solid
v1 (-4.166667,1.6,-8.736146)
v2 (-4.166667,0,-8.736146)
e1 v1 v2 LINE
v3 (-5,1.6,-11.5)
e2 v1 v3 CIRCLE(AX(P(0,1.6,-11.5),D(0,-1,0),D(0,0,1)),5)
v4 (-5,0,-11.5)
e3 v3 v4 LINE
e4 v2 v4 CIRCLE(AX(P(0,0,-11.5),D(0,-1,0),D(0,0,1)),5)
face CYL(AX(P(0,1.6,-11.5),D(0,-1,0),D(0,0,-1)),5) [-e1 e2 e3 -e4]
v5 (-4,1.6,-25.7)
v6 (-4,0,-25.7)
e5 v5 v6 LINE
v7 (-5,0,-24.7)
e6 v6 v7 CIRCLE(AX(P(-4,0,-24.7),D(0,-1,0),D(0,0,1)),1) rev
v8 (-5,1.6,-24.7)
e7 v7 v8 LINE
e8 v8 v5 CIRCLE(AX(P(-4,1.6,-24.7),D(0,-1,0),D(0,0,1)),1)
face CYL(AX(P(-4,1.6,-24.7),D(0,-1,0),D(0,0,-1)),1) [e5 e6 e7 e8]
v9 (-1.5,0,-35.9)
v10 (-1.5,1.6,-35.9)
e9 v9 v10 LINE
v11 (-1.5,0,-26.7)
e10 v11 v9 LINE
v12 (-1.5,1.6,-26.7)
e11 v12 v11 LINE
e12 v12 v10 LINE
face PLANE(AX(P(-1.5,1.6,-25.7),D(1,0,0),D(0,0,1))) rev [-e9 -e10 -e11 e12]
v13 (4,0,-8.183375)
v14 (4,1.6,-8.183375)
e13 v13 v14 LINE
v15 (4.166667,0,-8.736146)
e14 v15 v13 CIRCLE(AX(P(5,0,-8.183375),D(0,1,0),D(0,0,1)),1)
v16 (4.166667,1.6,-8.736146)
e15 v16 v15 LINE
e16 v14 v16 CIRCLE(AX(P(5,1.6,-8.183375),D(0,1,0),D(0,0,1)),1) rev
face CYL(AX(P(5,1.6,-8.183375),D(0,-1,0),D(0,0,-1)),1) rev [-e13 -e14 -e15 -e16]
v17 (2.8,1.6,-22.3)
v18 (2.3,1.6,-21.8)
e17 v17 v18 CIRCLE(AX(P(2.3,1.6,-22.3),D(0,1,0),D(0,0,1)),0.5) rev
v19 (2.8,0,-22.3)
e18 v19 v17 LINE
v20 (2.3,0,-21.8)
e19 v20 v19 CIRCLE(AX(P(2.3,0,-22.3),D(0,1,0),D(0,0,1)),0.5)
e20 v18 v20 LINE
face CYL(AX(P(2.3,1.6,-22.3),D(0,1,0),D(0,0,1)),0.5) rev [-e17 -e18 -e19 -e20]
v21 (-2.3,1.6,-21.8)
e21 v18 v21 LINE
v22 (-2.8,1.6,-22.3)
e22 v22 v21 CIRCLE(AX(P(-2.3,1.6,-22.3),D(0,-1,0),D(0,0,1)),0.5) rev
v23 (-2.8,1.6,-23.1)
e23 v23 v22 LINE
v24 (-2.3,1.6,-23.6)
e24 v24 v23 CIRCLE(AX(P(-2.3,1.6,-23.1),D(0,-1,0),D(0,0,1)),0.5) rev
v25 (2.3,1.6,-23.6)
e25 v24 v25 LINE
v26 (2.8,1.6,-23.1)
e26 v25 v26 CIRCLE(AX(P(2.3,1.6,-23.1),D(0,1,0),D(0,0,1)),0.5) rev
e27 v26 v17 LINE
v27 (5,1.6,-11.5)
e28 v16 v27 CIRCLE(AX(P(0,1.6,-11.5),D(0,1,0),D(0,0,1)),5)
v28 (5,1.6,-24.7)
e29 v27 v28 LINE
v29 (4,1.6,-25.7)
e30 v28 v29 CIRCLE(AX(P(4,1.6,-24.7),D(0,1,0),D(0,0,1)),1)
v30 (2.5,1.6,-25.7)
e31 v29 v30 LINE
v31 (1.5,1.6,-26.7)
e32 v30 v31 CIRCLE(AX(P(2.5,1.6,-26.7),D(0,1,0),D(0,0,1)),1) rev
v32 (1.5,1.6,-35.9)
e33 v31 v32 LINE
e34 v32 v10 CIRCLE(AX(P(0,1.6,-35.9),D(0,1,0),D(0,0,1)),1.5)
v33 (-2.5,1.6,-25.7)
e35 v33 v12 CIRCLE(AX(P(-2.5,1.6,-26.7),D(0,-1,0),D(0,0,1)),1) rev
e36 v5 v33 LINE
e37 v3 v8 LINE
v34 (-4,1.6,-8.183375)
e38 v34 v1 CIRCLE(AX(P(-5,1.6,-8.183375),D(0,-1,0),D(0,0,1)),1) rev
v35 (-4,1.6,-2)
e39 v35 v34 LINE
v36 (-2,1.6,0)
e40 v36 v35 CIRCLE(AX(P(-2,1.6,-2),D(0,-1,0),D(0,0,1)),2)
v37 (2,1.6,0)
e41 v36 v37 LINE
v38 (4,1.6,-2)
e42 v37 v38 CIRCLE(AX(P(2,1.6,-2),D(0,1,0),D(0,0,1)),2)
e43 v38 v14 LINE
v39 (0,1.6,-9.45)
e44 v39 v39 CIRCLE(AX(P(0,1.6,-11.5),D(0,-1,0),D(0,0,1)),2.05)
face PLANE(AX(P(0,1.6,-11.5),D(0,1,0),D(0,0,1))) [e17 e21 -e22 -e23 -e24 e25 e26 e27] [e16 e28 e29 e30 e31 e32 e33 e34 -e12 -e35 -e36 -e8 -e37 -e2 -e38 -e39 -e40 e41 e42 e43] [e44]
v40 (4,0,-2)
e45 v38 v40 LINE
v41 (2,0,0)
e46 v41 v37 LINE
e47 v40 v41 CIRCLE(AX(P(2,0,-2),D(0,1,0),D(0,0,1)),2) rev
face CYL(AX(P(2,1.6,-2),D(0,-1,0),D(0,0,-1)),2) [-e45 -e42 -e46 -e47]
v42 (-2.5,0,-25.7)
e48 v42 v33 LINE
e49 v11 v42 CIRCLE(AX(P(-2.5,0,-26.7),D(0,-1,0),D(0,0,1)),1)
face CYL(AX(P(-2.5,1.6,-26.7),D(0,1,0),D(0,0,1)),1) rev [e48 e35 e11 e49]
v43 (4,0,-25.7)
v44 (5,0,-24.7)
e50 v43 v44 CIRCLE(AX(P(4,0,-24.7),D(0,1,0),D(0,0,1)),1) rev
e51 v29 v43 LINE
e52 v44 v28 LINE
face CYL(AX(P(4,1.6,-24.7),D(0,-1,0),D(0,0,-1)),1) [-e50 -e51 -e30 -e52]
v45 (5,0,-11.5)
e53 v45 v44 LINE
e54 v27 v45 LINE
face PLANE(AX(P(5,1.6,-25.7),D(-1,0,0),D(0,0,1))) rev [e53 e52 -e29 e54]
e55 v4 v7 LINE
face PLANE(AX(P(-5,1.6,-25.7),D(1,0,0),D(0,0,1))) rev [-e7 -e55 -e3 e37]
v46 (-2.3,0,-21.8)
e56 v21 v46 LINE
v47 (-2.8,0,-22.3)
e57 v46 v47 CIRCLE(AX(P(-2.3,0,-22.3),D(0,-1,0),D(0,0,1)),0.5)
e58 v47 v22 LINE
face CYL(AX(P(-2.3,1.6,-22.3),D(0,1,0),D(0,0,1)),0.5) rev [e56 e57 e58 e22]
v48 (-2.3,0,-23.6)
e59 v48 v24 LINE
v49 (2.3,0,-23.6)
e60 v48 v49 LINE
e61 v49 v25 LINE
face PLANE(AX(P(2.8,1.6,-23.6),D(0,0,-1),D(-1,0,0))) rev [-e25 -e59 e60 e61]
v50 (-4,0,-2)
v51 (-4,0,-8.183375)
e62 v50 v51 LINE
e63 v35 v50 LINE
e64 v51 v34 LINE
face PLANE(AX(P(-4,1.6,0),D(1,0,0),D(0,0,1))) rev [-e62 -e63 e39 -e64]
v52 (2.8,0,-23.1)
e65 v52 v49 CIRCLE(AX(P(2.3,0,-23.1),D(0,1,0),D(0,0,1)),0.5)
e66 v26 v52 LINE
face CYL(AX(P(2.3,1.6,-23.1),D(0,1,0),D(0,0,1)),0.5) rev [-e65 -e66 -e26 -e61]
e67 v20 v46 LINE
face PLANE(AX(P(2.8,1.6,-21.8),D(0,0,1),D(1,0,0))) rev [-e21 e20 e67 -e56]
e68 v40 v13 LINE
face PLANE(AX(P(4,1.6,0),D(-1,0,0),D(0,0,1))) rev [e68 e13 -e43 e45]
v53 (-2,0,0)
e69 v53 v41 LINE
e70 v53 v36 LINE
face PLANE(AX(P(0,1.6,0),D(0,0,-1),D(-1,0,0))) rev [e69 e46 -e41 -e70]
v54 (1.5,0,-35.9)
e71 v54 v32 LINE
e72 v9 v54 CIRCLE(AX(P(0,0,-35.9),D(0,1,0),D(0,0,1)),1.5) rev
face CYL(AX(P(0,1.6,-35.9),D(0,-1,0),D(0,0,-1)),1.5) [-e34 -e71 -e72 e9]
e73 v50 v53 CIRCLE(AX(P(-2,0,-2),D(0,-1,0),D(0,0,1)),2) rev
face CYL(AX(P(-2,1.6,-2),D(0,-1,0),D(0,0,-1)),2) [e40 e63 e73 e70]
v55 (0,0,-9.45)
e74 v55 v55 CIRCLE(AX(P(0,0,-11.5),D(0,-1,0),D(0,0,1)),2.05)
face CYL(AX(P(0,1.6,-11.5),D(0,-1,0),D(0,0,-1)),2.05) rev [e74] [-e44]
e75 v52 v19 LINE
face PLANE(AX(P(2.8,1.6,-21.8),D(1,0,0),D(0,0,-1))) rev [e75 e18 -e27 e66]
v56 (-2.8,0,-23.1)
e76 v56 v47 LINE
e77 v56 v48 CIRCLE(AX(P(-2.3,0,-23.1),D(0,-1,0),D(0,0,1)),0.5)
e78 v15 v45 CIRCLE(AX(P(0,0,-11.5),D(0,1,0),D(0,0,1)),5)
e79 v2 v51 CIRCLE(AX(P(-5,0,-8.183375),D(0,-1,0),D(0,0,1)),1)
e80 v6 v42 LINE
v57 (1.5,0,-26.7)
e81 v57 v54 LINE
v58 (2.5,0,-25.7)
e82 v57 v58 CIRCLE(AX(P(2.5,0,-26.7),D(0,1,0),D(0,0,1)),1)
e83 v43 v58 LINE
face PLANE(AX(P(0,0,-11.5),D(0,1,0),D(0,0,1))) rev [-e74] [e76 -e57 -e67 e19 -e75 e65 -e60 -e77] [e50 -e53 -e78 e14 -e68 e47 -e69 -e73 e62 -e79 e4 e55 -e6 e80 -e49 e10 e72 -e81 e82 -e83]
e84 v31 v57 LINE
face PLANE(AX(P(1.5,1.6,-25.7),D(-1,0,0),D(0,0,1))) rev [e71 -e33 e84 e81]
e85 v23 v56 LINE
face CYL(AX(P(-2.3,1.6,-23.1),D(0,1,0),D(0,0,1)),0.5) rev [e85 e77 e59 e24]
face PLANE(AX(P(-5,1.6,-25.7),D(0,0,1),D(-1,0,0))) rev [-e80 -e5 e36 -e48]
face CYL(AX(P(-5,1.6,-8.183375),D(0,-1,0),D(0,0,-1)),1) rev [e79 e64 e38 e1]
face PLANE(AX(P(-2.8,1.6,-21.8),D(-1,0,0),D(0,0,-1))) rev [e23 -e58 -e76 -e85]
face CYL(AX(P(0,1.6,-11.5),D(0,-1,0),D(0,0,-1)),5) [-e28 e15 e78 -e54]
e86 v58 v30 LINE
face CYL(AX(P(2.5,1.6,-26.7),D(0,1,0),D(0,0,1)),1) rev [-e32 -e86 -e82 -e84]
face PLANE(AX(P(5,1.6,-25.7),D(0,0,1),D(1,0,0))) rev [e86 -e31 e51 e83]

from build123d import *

# Parameters (mm, degrees)
EXTRUDE_1_DEPTH = 1.6
FILLET_1_R      = 2
FILLET_2_R      = 1.5
FILLET_3_R      = 1
FILLET_4_R      = 0.5


with BuildPart() as part:
    # 草图1 → 凸台-拉伸1 (new body)
    with BuildSketch(Plane(origin=(0, 0, 0), x_dir=(1, 0, 0), z_dir=(0, 1, 0))):
        with BuildLine():
            Line((0, 37.4), (1.5, 37.4))
            Line((1.5, 37.4), (1.5, 25.7))
            Line((1.5, 25.7), (5, 25.7))
            Line((5, 25.7), (5, 11.5))
            ThreePointArc((5, 11.5), (4.74341649, 9.91886117), (4, 8.5))
            Line((4, 8.5), (4, 0))
            Line((4, 0), (0, 0))
            Line((0, 0), (0, 9.45))
            ThreePointArc((0, 9.45), (2.05, 11.5), (0, 13.55))
            Line((0, 13.55), (0, 21.8))
            Line((0, 21.8), (2.8, 21.8))
            Line((2.8, 21.8), (2.8, 23.6))
            Line((2.8, 23.6), (0, 23.6))
            Line((0, 23.6), (0, 37.4))
        make_face()
    extrude(amount=EXTRUDE_1_DEPTH)

    # 圆角1
    fillet_1_edges = [part.edges().sort_by_distance(p)[0] for p in [
        (4, 0.8, 0),
    ]]
    fillet(fillet_1_edges, radius=FILLET_1_R)

    # 圆角2
    fillet_2_edges = [part.edges().sort_by_distance(p)[0] for p in [
        (1.5, 0.8, -37.4),
    ]]
    fillet(fillet_2_edges, radius=FILLET_2_R - 0.0001)  # a hair under: the kernel refuses the full size

    # 圆角3
    fillet_3_edges = [part.edges().sort_by_distance(p)[0] for p in [
        (1.5, 0.8, -25.7),
        (5, 0.8, -25.7),
        (4, 0.8, -8.5),
    ]]
    fillet(fillet_3_edges, radius=FILLET_3_R)

    # 圆角4
    fillet_4_edges = [part.edges().sort_by_distance(p)[0] for p in [
        (2.8, 0.8, -21.8),
        (2.8, 0.8, -23.6),
    ]]
    fillet(fillet_4_edges, radius=FILLET_4_R)

    # 镜向1: part across plane


with BuildPart() as part_1:
    add(part.part)
    add(part.part.mirror(Plane(origin=(0, 1.6, -37.4), x_dir=(0, 0, 1), z_dir=(1, 0, 0))))


solid = part_1.part
